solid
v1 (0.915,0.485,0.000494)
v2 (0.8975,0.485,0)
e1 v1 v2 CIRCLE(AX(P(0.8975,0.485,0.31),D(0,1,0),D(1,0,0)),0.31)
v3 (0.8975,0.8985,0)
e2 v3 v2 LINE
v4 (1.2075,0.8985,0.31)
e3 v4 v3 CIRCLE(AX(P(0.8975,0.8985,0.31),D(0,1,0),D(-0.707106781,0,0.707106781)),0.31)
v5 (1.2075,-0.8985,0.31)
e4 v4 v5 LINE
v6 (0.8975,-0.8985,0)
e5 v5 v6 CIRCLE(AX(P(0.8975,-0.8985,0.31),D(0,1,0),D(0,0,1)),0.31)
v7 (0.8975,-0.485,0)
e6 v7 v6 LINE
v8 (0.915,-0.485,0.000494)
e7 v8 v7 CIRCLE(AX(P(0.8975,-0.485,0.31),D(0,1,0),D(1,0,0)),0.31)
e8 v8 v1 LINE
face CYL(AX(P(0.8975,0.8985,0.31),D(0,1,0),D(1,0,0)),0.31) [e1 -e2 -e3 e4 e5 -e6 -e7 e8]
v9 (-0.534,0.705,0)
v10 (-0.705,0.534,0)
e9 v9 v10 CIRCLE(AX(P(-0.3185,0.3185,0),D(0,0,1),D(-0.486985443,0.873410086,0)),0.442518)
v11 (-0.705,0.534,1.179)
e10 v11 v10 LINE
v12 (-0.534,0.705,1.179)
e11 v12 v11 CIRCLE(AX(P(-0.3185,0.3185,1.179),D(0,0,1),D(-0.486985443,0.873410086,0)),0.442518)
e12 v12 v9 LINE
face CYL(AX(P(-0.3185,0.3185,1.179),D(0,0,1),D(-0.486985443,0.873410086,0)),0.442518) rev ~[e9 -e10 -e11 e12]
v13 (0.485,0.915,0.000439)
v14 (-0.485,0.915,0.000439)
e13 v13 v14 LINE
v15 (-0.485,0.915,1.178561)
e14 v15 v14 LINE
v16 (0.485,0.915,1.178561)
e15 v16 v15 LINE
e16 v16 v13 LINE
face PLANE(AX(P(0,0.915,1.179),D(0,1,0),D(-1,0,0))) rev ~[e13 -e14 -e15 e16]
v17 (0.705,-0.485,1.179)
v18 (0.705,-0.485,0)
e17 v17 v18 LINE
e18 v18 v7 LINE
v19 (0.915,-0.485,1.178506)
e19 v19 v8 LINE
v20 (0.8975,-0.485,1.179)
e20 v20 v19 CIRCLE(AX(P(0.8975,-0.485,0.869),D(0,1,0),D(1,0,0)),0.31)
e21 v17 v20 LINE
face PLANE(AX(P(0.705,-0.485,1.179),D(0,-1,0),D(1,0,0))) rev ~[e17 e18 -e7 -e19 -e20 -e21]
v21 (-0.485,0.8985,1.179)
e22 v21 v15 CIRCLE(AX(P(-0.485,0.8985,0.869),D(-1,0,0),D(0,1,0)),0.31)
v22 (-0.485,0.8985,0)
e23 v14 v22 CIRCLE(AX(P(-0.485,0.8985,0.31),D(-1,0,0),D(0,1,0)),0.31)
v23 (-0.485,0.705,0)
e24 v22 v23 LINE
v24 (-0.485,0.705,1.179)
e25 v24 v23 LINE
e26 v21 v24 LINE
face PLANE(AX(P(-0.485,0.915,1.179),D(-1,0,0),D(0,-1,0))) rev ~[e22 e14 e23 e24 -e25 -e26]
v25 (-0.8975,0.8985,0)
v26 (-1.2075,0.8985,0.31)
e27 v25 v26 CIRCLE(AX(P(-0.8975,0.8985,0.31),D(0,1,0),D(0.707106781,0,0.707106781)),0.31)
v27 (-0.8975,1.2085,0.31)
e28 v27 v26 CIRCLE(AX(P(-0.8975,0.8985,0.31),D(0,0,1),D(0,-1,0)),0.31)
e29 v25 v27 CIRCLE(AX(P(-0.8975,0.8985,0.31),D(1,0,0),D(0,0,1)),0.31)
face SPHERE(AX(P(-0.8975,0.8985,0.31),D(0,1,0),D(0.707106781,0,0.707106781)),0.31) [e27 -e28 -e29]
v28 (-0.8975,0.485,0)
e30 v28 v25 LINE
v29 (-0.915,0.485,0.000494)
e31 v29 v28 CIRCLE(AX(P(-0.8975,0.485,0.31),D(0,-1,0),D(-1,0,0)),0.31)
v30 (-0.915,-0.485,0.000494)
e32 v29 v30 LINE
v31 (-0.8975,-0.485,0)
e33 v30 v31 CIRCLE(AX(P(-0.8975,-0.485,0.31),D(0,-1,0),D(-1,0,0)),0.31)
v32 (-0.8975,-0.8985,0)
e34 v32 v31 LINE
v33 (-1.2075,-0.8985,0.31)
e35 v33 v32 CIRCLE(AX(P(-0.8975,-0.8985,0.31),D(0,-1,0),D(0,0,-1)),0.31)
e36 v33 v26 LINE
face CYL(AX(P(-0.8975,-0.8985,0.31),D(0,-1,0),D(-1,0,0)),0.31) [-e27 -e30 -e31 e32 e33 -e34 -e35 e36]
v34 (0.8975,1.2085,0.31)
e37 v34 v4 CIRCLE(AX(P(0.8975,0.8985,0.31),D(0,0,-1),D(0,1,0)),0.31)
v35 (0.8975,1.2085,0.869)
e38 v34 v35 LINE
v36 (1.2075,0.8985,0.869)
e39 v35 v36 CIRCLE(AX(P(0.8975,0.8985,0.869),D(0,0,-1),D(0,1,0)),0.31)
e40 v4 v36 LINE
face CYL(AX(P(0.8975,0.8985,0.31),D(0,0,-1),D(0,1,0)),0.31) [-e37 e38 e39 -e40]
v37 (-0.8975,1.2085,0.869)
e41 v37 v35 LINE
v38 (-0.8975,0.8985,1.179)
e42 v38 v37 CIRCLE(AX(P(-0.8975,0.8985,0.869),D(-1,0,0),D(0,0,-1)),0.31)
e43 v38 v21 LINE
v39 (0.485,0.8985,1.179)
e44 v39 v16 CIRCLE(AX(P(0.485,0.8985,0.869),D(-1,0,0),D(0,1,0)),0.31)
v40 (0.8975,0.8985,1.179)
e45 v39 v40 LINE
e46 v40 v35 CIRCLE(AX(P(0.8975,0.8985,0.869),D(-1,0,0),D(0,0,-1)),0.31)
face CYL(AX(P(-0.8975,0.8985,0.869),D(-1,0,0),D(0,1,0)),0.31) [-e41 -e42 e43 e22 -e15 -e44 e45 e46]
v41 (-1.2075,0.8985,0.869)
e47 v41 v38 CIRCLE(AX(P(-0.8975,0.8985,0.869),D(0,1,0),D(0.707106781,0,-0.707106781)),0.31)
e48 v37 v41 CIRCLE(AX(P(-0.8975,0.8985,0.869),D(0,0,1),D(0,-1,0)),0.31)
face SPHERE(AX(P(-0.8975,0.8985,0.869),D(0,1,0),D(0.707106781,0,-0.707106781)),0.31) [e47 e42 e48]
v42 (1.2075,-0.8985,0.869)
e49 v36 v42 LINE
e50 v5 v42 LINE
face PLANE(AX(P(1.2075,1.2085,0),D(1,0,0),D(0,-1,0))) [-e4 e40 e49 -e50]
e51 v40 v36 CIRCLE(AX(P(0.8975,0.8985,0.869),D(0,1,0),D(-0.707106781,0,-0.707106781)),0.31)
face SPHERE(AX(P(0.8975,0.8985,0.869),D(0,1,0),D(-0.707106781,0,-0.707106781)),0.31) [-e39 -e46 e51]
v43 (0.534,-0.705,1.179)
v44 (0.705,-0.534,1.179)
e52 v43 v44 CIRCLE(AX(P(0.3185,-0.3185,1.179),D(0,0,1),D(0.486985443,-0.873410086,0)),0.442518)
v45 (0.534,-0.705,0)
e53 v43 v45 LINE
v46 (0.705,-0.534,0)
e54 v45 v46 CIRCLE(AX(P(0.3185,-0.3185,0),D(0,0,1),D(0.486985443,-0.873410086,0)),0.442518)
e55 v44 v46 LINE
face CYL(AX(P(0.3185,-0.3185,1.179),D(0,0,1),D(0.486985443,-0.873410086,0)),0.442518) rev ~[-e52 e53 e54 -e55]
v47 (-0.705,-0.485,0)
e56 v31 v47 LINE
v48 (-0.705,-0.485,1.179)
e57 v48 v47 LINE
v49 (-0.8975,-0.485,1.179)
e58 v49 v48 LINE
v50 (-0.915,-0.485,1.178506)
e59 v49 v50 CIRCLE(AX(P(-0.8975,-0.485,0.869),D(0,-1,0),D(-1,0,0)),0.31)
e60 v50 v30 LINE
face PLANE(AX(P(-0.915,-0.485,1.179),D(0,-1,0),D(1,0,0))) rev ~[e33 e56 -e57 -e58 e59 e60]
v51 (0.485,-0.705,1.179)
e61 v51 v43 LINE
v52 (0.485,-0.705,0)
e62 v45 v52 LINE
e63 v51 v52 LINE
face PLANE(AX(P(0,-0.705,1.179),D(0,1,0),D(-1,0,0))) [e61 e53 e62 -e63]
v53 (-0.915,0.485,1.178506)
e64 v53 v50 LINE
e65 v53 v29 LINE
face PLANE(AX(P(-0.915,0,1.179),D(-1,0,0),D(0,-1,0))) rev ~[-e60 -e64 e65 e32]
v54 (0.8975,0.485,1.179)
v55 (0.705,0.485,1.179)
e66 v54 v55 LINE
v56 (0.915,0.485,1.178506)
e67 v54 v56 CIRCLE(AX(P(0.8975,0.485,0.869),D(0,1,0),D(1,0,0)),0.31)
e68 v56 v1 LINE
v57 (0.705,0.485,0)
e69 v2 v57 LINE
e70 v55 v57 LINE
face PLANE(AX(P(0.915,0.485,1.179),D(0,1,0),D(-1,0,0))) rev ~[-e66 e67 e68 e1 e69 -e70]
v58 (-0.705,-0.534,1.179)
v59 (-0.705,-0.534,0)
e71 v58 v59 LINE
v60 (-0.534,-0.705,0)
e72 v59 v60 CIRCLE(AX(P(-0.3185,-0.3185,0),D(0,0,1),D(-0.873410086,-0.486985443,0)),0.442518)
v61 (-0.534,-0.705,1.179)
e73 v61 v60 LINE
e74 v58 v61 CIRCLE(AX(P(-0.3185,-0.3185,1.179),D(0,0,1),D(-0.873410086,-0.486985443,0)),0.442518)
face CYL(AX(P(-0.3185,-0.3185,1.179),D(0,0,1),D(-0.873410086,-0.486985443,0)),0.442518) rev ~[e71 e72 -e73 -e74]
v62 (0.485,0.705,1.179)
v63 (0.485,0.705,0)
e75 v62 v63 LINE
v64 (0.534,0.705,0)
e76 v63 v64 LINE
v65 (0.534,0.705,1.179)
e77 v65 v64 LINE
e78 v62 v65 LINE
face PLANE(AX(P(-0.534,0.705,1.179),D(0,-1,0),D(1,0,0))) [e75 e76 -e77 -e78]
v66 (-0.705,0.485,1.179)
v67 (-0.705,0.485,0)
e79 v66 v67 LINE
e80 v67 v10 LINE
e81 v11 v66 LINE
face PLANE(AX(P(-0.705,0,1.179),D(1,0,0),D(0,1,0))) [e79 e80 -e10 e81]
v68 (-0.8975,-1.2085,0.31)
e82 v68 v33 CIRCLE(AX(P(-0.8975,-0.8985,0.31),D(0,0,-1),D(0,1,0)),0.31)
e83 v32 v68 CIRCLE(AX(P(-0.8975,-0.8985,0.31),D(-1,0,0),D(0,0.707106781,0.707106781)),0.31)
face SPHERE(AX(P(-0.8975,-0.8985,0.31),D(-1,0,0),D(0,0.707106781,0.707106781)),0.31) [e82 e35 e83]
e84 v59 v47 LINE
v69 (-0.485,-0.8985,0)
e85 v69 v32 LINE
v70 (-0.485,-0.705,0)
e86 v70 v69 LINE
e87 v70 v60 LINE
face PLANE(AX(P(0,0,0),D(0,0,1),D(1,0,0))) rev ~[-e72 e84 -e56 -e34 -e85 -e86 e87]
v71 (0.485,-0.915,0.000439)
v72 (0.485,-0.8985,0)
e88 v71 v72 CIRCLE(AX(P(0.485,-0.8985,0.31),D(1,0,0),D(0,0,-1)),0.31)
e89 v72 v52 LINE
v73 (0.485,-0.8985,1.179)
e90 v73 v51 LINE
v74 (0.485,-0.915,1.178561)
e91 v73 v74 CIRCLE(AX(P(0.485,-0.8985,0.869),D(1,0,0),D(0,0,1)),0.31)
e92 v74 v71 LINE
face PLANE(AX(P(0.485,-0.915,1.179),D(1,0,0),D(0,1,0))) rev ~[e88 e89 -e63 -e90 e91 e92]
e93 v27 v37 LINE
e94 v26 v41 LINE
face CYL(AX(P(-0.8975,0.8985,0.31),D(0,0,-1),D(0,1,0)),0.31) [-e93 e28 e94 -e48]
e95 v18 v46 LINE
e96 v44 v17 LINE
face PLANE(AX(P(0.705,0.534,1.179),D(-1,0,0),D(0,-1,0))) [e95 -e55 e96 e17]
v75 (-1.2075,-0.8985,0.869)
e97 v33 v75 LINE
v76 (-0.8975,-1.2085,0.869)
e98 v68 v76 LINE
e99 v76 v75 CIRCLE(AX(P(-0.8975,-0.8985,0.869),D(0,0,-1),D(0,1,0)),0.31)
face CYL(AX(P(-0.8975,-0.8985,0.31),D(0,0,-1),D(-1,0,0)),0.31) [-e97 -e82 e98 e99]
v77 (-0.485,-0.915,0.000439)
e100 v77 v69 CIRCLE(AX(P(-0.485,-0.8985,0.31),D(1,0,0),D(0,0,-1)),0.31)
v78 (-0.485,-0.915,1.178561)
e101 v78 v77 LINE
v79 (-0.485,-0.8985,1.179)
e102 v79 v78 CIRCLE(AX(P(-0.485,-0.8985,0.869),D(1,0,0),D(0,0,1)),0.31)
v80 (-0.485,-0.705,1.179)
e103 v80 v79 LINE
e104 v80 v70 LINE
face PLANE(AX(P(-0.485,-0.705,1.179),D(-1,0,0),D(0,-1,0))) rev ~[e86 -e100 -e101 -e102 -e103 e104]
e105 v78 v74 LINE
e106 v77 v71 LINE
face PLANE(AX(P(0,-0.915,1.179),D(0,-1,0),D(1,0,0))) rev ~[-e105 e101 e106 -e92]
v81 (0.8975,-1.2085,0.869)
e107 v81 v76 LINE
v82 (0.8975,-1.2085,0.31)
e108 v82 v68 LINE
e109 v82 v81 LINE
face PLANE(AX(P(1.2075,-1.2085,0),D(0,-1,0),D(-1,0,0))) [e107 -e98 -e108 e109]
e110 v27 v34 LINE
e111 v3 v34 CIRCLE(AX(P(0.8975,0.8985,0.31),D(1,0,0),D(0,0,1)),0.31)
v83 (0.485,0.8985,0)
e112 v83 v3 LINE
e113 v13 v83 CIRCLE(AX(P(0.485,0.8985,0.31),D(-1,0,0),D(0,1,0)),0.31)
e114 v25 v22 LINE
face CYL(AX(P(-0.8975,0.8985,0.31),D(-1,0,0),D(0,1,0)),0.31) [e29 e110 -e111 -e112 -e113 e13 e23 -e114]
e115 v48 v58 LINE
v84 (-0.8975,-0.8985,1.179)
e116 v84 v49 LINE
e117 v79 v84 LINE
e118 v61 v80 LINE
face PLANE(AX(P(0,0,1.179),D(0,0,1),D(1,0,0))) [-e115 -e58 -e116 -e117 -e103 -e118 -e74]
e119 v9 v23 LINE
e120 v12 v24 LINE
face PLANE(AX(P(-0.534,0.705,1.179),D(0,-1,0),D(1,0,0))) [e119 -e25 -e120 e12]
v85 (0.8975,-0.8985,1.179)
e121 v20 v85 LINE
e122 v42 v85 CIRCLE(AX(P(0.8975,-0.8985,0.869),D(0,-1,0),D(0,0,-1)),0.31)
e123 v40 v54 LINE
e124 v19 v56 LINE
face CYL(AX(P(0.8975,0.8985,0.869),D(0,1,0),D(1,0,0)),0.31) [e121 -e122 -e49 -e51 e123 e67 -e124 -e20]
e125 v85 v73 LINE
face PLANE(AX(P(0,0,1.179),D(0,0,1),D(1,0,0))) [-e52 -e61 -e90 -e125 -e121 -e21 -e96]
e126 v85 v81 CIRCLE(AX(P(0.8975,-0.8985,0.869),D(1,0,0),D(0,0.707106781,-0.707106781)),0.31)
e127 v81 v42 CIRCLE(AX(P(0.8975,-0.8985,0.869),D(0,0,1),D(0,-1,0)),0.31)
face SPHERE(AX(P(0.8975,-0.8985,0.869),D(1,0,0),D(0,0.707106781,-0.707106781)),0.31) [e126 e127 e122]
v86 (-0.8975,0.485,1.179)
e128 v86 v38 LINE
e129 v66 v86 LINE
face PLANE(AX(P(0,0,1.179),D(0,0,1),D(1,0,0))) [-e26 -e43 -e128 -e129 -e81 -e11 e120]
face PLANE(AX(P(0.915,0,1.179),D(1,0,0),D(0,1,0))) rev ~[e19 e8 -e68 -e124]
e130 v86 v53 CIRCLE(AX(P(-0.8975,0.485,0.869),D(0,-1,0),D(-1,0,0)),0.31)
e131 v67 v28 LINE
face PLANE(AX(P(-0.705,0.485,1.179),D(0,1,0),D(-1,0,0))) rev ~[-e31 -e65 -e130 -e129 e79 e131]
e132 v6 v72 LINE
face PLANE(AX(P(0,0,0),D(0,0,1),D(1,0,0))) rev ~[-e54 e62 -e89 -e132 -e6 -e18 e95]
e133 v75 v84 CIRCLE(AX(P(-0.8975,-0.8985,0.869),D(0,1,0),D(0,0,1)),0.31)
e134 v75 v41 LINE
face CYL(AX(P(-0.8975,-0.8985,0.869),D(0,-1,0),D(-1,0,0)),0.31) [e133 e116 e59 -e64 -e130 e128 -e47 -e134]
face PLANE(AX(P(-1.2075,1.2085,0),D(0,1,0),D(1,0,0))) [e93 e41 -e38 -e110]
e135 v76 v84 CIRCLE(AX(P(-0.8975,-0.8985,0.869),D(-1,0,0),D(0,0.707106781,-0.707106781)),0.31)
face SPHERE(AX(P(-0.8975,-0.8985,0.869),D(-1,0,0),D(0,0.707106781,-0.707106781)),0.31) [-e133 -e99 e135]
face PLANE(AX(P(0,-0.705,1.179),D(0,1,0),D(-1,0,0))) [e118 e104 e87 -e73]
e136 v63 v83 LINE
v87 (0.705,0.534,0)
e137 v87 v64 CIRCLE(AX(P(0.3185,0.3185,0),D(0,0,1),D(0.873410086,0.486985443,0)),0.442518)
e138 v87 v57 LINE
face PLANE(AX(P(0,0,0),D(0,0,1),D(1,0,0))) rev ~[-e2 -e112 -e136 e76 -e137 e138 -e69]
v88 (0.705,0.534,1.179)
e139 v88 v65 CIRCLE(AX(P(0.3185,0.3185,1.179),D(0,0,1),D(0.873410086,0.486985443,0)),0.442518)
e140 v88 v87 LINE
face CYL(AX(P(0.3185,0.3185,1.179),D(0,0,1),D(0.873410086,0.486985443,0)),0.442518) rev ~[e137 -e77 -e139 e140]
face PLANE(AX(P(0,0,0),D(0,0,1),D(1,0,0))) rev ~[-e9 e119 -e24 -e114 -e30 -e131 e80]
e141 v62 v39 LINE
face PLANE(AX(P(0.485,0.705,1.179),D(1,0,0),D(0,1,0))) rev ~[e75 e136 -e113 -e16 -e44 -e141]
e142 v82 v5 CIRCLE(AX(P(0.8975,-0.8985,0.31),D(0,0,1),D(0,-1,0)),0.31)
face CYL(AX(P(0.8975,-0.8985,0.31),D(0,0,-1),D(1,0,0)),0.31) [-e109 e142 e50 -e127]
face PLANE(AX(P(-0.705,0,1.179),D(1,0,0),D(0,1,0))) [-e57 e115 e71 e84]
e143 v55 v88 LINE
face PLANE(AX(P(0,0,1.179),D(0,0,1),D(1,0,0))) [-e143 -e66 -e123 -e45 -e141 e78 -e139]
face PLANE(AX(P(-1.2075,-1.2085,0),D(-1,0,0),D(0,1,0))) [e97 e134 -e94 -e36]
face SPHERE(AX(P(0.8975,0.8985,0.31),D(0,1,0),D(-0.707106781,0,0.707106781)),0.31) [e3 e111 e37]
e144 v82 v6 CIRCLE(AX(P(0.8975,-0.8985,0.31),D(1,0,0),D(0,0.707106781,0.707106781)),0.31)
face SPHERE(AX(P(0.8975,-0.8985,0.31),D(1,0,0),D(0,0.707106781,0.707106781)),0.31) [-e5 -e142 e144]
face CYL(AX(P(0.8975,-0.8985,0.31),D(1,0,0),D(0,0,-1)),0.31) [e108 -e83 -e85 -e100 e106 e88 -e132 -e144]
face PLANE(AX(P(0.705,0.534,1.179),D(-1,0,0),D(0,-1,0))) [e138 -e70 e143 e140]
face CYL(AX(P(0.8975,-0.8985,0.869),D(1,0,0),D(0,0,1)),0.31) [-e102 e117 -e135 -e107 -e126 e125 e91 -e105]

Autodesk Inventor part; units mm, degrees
ref_plane "YZ Plane" through (0, 0, 0) normal (1, 0, 0) x (0, 1, 0)
ref_plane "XZ Plane" through (0, 0, 0) normal (0, 1, 0) x (-1, 0, 0)
ref_plane "XY Plane" through (0, 0, 0) normal (0, 0, 1) x (1, 0, 0)
sketch "Sketch1" plane through (0, 0, 0) normal (0, 0, 1) x (1, 0, 0)
  line L0 (-1.2075, 1.2085) -> (1.2075, 1.2085)
  line L1 (1.2075, 1.2085) -> (1.2075, -1.2085)
  line L2 (1.2075, -1.2085) -> (-1.2075, -1.2085)
  line L3 (-1.2075, -1.2085) -> (-1.2075, 1.2085)
  point P0 (0, 0)
  point P1 (0, 0)
  point P2 (0, 1.2085)
  point P3 (-1.2075, 0)
  dimension "d0" = 2.415
  dimension "d1" = 2.417
extrude "Extrusion1" add sketch "Sketch1" along normal blind 1.179
sketch "Sketch2" plane through (0, 0, 1.179) normal (0, 0, 1) x (1, 0, 0)
  line L0 (-0.705, 0.705) -> (-0.534, 0.705)
  line L1 (0.705, 0.705) -> (0.705, 0.534)
  line L2 (0.705, -0.705) -> (0.534, -0.705)
  line L3 (-0.705, -0.705) -> (-0.705, -0.534)
  line L4 (0, -1.6919) -> (0, 1.6919) projected
  line L5 (-1.6905, 0) -> (1.6905, 0) projected
  arc A0 (-0.534, 0.705) -> (-0.705, 0.534) centre (-0.3185, 0.3185) ccw
  arc A1 (0.705, 0.534) -> (0.534, 0.705) centre (0.3185, 0.3185) ccw
  arc A2 (-0.705, -0.534) -> (-0.534, -0.705) centre (-0.3185, -0.3185) ccw
  arc A3 (0.534, -0.705) -> (0.705, -0.534) centre (0.3185, -0.3185) ccw
  line L6 (0.705, -0.534) -> (0.705, -0.705)
  line L7 (0.534, -0.705) -> (-0.534, -0.705)
  line L8 (-0.534, -0.705) -> (-0.705, -0.705)
  line L9 (-0.705, -0.534) -> (-0.705, 0.534)
  line L10 (-0.705, 0.534) -> (-0.705, 0.705)
  line L11 (-0.534, 0.705) -> (0.534, 0.705)
  line L12 (0.534, 0.705) -> (0.705, 0.705)
  line L13 (0.705, 0.534) -> (0.705, -0.534)
  point P0 (0, 0)
  point P1 (-0.705, 0)
  point P2 (0, 0.705)
  dimension "d4" = 1.41
  dimension "d5" = 1.41
  dimension "d7" = 0.171
  dimension "d8" = 0.171
extrude "Extrusion2" cut sketch "Sketch2" against normal through all contours L11 L4 L5 L9 A0 | L11 A1 L13 L5 L4 | L5 L4 L7 A2 L9 | L5 L13 A3 L7 L4
sketch "Sketch3" plane through (0, 0, 1.179) normal (0, 0, 1) x (1, 0, 0)
  line L0 (-0.705, -0.534) -> (-0.705, 0.534) projected
  line L1 (-0.705, 0.485) -> (-0.915, 0.485)
  line L2 (-0.915, 0.485) -> (-0.915, -0.485)
  line L3 (-0.915, -0.485) -> (-0.705, -0.485)
  line L4 (-0.705, -0.485) -> (-0.705, 0.485)
  line L5 (-1.6905, 0) -> (1.6905, 0) projected
  line L6 (0, -1.6919) -> (0, 1.6919) projected
  point P0 (0, 0)
  point P1 (-0.915, 0)
  dimension "d11" = 0.21
  dimension "d12" = 0.97
extrude "Extrusion3" cut sketch "Sketch3" against normal through all
pattern_circular "Circular Pattern1" count 4 over 360 about axis through (0, 0, -10) along (0, 0, 1) of "Extrusion3"
fillet "Fillet1" radius 0.31 12 edges at (-1.2075, 1.2085, 0.5895) (0, 1.2085, 1.179) (1.2075, 1.2085, 0.5895) (0, 1.2085, 0) (1.2075, 0, 0) (1.2075, 0, 1.179) (-1.2075, 0, 1.179) (-1.2075, 0, 0) (-1.2075, -1.2085, 0.5895) (0, -1.2085, 1.179) (0, -1.2085, 0) (1.2075, -1.2085, 0.5895)
properties part number "Frame_Support2" material "Stainless Steel"
